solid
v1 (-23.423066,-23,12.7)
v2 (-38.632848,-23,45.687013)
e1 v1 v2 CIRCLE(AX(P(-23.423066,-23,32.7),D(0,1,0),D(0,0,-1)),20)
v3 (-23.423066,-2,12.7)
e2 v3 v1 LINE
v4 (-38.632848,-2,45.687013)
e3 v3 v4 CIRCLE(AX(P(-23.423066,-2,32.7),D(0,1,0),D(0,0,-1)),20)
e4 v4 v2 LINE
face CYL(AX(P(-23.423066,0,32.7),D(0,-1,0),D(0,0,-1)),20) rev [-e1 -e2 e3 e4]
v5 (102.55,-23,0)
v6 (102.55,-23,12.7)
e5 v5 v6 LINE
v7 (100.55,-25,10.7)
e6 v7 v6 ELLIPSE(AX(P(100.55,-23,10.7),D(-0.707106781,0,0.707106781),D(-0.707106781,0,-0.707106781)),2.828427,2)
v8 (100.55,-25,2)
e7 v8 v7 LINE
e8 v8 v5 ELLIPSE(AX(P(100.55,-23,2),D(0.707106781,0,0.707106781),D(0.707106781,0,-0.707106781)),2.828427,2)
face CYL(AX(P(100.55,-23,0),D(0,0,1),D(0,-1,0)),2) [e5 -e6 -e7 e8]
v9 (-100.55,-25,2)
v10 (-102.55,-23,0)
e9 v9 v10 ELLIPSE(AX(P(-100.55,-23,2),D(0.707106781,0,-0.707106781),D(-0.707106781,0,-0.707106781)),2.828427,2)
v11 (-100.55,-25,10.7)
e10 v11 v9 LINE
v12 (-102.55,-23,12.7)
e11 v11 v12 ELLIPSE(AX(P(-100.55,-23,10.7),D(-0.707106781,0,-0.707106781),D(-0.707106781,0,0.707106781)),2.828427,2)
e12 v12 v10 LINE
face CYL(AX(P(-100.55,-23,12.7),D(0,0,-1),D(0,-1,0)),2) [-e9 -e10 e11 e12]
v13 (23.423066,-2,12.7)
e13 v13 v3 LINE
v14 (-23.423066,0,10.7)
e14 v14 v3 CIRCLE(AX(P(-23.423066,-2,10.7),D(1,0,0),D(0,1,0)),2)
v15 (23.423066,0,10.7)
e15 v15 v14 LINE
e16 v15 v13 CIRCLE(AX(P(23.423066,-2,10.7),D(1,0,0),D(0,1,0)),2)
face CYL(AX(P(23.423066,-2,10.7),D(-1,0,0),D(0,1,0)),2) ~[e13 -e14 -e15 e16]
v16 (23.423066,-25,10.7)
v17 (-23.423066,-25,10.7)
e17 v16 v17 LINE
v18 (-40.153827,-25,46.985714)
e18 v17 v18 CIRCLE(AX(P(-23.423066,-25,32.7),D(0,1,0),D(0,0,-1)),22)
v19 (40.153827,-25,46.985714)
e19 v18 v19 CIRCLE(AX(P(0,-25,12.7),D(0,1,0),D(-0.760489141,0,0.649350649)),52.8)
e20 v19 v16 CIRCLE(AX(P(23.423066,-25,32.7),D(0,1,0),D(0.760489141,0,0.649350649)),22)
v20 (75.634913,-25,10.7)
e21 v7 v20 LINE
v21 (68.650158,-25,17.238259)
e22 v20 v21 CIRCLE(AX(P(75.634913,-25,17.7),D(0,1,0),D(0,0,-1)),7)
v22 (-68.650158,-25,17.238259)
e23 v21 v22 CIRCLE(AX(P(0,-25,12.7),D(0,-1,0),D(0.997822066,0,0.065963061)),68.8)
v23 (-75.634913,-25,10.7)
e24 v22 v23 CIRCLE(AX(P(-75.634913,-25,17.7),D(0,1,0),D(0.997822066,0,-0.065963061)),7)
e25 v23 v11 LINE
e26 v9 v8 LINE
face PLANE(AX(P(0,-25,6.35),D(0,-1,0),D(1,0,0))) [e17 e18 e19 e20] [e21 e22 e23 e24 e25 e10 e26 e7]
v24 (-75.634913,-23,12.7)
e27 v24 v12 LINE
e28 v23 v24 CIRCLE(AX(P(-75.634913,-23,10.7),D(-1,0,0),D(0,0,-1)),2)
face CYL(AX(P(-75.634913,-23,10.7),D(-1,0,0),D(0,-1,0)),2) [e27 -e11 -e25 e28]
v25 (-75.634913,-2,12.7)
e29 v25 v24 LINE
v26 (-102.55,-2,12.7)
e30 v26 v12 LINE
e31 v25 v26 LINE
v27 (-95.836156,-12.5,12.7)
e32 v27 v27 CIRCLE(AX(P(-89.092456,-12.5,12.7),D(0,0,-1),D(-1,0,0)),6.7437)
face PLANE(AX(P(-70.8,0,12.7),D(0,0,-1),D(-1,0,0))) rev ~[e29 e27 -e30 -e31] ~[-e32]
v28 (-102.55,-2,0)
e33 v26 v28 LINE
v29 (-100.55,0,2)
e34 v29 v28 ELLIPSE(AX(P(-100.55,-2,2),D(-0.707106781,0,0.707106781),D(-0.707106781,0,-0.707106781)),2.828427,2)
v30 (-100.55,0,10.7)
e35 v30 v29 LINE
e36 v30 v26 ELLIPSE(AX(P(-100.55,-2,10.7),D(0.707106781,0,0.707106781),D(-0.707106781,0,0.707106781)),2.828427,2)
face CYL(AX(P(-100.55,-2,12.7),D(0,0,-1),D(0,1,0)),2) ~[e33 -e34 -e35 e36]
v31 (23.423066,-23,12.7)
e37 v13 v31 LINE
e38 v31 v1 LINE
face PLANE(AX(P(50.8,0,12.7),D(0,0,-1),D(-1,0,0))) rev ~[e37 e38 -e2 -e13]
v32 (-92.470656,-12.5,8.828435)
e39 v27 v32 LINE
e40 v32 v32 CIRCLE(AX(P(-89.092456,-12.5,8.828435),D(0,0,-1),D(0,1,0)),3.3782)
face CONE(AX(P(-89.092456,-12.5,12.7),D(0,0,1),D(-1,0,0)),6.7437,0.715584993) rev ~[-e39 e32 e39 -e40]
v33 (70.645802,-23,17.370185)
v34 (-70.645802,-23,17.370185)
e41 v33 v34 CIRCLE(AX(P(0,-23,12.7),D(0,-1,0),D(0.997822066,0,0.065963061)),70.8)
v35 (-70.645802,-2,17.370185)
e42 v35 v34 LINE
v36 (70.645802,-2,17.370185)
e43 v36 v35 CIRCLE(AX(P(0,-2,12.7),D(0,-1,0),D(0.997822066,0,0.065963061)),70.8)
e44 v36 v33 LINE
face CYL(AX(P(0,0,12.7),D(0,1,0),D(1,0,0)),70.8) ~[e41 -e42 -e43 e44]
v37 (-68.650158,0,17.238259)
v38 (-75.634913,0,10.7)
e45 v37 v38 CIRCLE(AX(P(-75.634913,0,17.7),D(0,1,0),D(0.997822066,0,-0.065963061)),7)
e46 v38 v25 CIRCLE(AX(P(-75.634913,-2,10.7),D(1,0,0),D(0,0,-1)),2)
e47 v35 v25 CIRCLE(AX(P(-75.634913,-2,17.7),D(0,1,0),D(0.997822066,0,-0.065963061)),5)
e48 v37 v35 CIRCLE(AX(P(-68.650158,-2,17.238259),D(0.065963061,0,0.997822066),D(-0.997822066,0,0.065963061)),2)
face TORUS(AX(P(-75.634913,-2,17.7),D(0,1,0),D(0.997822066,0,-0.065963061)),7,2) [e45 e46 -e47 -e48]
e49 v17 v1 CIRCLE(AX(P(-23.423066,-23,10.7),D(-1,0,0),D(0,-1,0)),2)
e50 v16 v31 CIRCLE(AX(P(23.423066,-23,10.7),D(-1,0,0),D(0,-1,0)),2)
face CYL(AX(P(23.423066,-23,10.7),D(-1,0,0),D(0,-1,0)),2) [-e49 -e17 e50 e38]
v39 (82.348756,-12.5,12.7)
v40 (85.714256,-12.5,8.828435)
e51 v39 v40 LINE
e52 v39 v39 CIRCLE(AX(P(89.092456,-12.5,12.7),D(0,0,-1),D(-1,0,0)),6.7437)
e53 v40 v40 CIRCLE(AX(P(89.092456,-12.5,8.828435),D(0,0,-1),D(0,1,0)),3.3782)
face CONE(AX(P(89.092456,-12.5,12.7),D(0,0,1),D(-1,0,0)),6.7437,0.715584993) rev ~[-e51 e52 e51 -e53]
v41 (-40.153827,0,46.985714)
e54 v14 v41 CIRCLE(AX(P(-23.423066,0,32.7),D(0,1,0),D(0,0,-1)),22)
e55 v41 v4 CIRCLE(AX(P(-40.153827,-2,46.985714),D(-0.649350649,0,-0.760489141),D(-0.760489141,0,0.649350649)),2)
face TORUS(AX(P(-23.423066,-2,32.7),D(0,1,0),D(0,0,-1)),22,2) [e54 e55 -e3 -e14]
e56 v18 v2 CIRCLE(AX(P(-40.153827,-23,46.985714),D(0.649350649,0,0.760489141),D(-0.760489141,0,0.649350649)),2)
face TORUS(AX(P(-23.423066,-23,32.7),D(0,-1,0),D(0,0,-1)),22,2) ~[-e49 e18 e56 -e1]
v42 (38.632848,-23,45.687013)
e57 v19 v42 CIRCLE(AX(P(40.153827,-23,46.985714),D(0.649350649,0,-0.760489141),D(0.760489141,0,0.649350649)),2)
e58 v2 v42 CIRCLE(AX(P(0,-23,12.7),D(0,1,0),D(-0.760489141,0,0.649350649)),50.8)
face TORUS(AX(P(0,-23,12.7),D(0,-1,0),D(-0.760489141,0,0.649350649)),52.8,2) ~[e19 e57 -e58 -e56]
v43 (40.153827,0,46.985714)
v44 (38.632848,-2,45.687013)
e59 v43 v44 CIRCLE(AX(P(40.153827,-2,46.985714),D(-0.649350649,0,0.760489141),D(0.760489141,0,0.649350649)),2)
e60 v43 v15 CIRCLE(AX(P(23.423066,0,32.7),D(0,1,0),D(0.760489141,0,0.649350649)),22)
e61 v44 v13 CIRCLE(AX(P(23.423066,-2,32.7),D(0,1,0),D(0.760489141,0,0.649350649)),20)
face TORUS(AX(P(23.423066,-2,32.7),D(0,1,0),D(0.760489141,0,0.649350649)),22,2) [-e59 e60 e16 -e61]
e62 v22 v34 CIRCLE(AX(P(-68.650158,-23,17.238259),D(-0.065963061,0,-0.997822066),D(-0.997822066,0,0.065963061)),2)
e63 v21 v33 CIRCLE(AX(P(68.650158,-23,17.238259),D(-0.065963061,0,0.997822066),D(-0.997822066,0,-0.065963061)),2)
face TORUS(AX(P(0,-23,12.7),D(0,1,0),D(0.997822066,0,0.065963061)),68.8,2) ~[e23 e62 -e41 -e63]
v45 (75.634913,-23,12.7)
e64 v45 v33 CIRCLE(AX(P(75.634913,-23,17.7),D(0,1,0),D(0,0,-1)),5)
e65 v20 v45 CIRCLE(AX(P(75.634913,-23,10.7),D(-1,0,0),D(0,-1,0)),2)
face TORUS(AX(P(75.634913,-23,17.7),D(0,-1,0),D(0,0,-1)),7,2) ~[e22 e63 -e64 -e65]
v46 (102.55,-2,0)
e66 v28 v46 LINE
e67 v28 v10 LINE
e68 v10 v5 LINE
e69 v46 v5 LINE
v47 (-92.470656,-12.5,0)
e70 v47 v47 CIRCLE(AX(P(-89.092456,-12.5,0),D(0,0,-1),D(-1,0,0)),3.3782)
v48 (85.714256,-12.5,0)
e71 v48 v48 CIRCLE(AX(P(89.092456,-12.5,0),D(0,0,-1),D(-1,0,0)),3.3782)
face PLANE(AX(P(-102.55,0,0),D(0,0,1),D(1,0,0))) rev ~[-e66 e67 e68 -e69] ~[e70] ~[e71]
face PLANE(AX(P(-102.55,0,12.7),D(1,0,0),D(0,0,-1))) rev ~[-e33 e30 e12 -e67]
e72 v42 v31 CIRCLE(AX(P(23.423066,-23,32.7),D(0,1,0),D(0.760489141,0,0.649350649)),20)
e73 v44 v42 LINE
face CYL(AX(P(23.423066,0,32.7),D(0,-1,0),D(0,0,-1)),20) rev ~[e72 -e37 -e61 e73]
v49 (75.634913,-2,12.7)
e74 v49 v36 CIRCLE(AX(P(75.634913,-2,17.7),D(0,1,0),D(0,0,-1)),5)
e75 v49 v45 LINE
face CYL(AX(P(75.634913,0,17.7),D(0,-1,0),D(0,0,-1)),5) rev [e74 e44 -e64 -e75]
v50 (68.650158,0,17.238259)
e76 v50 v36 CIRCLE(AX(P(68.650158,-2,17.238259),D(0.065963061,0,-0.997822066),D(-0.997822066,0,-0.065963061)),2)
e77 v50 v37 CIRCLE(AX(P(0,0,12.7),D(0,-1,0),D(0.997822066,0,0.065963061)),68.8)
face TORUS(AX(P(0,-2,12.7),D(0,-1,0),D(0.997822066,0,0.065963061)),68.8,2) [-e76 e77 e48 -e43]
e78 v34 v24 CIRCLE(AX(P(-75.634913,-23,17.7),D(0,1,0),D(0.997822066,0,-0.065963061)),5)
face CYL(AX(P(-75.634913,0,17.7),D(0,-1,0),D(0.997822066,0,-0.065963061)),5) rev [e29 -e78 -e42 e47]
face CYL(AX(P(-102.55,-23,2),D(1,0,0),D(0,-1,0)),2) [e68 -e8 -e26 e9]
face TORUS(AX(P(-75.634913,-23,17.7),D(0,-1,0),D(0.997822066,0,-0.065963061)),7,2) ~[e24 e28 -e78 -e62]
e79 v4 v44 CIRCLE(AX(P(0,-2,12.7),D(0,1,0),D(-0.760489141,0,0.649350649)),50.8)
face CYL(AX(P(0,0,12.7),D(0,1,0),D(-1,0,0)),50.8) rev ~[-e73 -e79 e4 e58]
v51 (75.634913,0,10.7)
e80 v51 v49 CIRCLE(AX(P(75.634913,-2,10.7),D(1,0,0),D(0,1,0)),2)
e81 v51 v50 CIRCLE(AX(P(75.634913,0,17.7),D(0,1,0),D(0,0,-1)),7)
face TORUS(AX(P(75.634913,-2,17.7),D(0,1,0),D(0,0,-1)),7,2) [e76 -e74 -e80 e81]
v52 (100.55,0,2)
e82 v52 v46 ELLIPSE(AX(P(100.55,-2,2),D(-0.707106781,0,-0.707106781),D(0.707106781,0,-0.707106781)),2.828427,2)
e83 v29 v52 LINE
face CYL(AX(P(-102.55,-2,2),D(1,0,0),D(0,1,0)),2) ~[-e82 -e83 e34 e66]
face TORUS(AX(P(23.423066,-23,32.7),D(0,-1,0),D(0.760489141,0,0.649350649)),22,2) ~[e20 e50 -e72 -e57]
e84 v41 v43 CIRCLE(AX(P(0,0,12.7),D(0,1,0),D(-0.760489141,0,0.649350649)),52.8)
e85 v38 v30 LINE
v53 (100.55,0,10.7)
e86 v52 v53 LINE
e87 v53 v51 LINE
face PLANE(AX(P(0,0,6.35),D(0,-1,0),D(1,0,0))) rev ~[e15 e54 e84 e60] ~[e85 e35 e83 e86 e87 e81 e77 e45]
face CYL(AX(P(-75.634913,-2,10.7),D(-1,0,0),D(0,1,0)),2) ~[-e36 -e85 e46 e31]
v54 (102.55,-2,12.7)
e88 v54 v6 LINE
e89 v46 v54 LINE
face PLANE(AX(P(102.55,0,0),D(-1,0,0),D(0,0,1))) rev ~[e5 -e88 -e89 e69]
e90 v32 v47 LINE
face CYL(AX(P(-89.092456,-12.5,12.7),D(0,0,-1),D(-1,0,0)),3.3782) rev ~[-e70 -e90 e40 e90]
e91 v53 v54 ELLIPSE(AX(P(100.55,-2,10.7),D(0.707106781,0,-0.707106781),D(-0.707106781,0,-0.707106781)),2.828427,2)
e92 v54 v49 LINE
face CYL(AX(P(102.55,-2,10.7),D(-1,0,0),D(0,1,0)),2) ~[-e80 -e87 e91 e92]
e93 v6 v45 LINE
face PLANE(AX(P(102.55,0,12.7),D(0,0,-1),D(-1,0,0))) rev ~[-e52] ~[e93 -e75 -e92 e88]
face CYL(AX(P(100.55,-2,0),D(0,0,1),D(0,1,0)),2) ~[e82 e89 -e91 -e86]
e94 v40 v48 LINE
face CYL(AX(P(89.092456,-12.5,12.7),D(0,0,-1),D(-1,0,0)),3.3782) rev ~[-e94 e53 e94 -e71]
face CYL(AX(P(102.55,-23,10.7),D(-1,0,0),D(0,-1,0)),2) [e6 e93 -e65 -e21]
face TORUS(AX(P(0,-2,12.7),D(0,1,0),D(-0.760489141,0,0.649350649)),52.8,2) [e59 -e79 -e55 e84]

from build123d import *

# Parameters (mm, degrees)
F1_DEPTH       = 25
F2_R           = 20
F3_R           = 5
F5_D           = 6.7564
F5_DEPTH       = 15
F5_CSINK_D     = 13.4874
F5_CSINK_ANGLE = 82
F5_TIP         = 2.0298273432
F6_R           = 2


with BuildPart() as f1:
    # F0 (on Front) → F1 (new body)
    with BuildSketch(Plane.XZ):
        Polygon((-70.8, 12.7), (-102.55, 12.7), (-102.55, 0), (102.55, 0), (102.55, 12.7), (70.8, 12.7), (50.8, 12.7), (-50.8, 12.7), align=None)
        with BuildLine():
            ThreePointArc((70.8, 12.7), (0, 83.5), (-70.8, 12.7))
            Line((-70.8, 12.7), (-50.8, 12.7))
            ThreePointArc((-50.8, 12.7), (0, 63.5), (50.8, 12.7))
            Line((50.8, 12.7), (70.8, 12.7))
        make_face()
    extrude(amount=F1_DEPTH)

    # F2
    f2_edges = [f1.edges().sort_by_distance(p)[0] for p in [
        (50.8, -12.5, 12.7),
        (-50.8, -12.5, 12.7),
    ]]
    fillet(f2_edges, radius=F2_R)

    # F3
    f3_edges = [f1.edges().sort_by_distance(p)[0] for p in [
        (70.8, -12.5, 12.7),
        (-70.8, -12.5, 12.7),
    ]]
    fillet(f3_edges, radius=F3_R)

    # F5
    with Locations(Plane.XY.offset(12.7)):
        with Locations((89.0924562867, -12.5), (-89.0924562867, -12.5)):
            CounterSinkHole(F5_D / 2, F5_CSINK_D / 2, depth=F5_DEPTH, counter_sink_angle=F5_CSINK_ANGLE)
            with Locations((0, 0, -(F5_DEPTH + F5_TIP / 2))):  # 118° drill point
                Cone(0, F5_D / 2, F5_TIP, mode=Mode.SUBTRACT)

    # F6
    f6_edges = [f1.edges().sort_by_distance(p)[0] for p in [
        (-89.092456, -25, 12.7),
        (-72.217975, -25, 14.049721),
        (-102.55, -25, 6.35),
        (0, -25, 83.5),
        (0, -25, 0),
        (72.217975, -25, 14.049721),
        (102.55, -25, 6.35),
        (89.092456, -25, 12.7),
        (0, -25, 12.7),
        (41.585393, -25, 24.325642),
        (-41.585393, -25, 24.325642),
        (0, -25, 63.5),
        (-89.092456, 0, 12.7),
        (-72.217975, 0, 14.049721),
        (-102.55, 0, 6.35),
        (0, 0, 83.5),
        (0, 0, 0),
        (72.217975, 0, 14.049721),
        (102.55, 0, 6.35),
        (89.092456, 0, 12.7),
        (0, 0, 12.7),
        (41.585393, 0, 24.325642),
        (-41.585393, 0, 24.325642),
        (0, 0, 63.5),
    ]]
    fillet(f6_edges, radius=F6_R)


solid = f1.part
